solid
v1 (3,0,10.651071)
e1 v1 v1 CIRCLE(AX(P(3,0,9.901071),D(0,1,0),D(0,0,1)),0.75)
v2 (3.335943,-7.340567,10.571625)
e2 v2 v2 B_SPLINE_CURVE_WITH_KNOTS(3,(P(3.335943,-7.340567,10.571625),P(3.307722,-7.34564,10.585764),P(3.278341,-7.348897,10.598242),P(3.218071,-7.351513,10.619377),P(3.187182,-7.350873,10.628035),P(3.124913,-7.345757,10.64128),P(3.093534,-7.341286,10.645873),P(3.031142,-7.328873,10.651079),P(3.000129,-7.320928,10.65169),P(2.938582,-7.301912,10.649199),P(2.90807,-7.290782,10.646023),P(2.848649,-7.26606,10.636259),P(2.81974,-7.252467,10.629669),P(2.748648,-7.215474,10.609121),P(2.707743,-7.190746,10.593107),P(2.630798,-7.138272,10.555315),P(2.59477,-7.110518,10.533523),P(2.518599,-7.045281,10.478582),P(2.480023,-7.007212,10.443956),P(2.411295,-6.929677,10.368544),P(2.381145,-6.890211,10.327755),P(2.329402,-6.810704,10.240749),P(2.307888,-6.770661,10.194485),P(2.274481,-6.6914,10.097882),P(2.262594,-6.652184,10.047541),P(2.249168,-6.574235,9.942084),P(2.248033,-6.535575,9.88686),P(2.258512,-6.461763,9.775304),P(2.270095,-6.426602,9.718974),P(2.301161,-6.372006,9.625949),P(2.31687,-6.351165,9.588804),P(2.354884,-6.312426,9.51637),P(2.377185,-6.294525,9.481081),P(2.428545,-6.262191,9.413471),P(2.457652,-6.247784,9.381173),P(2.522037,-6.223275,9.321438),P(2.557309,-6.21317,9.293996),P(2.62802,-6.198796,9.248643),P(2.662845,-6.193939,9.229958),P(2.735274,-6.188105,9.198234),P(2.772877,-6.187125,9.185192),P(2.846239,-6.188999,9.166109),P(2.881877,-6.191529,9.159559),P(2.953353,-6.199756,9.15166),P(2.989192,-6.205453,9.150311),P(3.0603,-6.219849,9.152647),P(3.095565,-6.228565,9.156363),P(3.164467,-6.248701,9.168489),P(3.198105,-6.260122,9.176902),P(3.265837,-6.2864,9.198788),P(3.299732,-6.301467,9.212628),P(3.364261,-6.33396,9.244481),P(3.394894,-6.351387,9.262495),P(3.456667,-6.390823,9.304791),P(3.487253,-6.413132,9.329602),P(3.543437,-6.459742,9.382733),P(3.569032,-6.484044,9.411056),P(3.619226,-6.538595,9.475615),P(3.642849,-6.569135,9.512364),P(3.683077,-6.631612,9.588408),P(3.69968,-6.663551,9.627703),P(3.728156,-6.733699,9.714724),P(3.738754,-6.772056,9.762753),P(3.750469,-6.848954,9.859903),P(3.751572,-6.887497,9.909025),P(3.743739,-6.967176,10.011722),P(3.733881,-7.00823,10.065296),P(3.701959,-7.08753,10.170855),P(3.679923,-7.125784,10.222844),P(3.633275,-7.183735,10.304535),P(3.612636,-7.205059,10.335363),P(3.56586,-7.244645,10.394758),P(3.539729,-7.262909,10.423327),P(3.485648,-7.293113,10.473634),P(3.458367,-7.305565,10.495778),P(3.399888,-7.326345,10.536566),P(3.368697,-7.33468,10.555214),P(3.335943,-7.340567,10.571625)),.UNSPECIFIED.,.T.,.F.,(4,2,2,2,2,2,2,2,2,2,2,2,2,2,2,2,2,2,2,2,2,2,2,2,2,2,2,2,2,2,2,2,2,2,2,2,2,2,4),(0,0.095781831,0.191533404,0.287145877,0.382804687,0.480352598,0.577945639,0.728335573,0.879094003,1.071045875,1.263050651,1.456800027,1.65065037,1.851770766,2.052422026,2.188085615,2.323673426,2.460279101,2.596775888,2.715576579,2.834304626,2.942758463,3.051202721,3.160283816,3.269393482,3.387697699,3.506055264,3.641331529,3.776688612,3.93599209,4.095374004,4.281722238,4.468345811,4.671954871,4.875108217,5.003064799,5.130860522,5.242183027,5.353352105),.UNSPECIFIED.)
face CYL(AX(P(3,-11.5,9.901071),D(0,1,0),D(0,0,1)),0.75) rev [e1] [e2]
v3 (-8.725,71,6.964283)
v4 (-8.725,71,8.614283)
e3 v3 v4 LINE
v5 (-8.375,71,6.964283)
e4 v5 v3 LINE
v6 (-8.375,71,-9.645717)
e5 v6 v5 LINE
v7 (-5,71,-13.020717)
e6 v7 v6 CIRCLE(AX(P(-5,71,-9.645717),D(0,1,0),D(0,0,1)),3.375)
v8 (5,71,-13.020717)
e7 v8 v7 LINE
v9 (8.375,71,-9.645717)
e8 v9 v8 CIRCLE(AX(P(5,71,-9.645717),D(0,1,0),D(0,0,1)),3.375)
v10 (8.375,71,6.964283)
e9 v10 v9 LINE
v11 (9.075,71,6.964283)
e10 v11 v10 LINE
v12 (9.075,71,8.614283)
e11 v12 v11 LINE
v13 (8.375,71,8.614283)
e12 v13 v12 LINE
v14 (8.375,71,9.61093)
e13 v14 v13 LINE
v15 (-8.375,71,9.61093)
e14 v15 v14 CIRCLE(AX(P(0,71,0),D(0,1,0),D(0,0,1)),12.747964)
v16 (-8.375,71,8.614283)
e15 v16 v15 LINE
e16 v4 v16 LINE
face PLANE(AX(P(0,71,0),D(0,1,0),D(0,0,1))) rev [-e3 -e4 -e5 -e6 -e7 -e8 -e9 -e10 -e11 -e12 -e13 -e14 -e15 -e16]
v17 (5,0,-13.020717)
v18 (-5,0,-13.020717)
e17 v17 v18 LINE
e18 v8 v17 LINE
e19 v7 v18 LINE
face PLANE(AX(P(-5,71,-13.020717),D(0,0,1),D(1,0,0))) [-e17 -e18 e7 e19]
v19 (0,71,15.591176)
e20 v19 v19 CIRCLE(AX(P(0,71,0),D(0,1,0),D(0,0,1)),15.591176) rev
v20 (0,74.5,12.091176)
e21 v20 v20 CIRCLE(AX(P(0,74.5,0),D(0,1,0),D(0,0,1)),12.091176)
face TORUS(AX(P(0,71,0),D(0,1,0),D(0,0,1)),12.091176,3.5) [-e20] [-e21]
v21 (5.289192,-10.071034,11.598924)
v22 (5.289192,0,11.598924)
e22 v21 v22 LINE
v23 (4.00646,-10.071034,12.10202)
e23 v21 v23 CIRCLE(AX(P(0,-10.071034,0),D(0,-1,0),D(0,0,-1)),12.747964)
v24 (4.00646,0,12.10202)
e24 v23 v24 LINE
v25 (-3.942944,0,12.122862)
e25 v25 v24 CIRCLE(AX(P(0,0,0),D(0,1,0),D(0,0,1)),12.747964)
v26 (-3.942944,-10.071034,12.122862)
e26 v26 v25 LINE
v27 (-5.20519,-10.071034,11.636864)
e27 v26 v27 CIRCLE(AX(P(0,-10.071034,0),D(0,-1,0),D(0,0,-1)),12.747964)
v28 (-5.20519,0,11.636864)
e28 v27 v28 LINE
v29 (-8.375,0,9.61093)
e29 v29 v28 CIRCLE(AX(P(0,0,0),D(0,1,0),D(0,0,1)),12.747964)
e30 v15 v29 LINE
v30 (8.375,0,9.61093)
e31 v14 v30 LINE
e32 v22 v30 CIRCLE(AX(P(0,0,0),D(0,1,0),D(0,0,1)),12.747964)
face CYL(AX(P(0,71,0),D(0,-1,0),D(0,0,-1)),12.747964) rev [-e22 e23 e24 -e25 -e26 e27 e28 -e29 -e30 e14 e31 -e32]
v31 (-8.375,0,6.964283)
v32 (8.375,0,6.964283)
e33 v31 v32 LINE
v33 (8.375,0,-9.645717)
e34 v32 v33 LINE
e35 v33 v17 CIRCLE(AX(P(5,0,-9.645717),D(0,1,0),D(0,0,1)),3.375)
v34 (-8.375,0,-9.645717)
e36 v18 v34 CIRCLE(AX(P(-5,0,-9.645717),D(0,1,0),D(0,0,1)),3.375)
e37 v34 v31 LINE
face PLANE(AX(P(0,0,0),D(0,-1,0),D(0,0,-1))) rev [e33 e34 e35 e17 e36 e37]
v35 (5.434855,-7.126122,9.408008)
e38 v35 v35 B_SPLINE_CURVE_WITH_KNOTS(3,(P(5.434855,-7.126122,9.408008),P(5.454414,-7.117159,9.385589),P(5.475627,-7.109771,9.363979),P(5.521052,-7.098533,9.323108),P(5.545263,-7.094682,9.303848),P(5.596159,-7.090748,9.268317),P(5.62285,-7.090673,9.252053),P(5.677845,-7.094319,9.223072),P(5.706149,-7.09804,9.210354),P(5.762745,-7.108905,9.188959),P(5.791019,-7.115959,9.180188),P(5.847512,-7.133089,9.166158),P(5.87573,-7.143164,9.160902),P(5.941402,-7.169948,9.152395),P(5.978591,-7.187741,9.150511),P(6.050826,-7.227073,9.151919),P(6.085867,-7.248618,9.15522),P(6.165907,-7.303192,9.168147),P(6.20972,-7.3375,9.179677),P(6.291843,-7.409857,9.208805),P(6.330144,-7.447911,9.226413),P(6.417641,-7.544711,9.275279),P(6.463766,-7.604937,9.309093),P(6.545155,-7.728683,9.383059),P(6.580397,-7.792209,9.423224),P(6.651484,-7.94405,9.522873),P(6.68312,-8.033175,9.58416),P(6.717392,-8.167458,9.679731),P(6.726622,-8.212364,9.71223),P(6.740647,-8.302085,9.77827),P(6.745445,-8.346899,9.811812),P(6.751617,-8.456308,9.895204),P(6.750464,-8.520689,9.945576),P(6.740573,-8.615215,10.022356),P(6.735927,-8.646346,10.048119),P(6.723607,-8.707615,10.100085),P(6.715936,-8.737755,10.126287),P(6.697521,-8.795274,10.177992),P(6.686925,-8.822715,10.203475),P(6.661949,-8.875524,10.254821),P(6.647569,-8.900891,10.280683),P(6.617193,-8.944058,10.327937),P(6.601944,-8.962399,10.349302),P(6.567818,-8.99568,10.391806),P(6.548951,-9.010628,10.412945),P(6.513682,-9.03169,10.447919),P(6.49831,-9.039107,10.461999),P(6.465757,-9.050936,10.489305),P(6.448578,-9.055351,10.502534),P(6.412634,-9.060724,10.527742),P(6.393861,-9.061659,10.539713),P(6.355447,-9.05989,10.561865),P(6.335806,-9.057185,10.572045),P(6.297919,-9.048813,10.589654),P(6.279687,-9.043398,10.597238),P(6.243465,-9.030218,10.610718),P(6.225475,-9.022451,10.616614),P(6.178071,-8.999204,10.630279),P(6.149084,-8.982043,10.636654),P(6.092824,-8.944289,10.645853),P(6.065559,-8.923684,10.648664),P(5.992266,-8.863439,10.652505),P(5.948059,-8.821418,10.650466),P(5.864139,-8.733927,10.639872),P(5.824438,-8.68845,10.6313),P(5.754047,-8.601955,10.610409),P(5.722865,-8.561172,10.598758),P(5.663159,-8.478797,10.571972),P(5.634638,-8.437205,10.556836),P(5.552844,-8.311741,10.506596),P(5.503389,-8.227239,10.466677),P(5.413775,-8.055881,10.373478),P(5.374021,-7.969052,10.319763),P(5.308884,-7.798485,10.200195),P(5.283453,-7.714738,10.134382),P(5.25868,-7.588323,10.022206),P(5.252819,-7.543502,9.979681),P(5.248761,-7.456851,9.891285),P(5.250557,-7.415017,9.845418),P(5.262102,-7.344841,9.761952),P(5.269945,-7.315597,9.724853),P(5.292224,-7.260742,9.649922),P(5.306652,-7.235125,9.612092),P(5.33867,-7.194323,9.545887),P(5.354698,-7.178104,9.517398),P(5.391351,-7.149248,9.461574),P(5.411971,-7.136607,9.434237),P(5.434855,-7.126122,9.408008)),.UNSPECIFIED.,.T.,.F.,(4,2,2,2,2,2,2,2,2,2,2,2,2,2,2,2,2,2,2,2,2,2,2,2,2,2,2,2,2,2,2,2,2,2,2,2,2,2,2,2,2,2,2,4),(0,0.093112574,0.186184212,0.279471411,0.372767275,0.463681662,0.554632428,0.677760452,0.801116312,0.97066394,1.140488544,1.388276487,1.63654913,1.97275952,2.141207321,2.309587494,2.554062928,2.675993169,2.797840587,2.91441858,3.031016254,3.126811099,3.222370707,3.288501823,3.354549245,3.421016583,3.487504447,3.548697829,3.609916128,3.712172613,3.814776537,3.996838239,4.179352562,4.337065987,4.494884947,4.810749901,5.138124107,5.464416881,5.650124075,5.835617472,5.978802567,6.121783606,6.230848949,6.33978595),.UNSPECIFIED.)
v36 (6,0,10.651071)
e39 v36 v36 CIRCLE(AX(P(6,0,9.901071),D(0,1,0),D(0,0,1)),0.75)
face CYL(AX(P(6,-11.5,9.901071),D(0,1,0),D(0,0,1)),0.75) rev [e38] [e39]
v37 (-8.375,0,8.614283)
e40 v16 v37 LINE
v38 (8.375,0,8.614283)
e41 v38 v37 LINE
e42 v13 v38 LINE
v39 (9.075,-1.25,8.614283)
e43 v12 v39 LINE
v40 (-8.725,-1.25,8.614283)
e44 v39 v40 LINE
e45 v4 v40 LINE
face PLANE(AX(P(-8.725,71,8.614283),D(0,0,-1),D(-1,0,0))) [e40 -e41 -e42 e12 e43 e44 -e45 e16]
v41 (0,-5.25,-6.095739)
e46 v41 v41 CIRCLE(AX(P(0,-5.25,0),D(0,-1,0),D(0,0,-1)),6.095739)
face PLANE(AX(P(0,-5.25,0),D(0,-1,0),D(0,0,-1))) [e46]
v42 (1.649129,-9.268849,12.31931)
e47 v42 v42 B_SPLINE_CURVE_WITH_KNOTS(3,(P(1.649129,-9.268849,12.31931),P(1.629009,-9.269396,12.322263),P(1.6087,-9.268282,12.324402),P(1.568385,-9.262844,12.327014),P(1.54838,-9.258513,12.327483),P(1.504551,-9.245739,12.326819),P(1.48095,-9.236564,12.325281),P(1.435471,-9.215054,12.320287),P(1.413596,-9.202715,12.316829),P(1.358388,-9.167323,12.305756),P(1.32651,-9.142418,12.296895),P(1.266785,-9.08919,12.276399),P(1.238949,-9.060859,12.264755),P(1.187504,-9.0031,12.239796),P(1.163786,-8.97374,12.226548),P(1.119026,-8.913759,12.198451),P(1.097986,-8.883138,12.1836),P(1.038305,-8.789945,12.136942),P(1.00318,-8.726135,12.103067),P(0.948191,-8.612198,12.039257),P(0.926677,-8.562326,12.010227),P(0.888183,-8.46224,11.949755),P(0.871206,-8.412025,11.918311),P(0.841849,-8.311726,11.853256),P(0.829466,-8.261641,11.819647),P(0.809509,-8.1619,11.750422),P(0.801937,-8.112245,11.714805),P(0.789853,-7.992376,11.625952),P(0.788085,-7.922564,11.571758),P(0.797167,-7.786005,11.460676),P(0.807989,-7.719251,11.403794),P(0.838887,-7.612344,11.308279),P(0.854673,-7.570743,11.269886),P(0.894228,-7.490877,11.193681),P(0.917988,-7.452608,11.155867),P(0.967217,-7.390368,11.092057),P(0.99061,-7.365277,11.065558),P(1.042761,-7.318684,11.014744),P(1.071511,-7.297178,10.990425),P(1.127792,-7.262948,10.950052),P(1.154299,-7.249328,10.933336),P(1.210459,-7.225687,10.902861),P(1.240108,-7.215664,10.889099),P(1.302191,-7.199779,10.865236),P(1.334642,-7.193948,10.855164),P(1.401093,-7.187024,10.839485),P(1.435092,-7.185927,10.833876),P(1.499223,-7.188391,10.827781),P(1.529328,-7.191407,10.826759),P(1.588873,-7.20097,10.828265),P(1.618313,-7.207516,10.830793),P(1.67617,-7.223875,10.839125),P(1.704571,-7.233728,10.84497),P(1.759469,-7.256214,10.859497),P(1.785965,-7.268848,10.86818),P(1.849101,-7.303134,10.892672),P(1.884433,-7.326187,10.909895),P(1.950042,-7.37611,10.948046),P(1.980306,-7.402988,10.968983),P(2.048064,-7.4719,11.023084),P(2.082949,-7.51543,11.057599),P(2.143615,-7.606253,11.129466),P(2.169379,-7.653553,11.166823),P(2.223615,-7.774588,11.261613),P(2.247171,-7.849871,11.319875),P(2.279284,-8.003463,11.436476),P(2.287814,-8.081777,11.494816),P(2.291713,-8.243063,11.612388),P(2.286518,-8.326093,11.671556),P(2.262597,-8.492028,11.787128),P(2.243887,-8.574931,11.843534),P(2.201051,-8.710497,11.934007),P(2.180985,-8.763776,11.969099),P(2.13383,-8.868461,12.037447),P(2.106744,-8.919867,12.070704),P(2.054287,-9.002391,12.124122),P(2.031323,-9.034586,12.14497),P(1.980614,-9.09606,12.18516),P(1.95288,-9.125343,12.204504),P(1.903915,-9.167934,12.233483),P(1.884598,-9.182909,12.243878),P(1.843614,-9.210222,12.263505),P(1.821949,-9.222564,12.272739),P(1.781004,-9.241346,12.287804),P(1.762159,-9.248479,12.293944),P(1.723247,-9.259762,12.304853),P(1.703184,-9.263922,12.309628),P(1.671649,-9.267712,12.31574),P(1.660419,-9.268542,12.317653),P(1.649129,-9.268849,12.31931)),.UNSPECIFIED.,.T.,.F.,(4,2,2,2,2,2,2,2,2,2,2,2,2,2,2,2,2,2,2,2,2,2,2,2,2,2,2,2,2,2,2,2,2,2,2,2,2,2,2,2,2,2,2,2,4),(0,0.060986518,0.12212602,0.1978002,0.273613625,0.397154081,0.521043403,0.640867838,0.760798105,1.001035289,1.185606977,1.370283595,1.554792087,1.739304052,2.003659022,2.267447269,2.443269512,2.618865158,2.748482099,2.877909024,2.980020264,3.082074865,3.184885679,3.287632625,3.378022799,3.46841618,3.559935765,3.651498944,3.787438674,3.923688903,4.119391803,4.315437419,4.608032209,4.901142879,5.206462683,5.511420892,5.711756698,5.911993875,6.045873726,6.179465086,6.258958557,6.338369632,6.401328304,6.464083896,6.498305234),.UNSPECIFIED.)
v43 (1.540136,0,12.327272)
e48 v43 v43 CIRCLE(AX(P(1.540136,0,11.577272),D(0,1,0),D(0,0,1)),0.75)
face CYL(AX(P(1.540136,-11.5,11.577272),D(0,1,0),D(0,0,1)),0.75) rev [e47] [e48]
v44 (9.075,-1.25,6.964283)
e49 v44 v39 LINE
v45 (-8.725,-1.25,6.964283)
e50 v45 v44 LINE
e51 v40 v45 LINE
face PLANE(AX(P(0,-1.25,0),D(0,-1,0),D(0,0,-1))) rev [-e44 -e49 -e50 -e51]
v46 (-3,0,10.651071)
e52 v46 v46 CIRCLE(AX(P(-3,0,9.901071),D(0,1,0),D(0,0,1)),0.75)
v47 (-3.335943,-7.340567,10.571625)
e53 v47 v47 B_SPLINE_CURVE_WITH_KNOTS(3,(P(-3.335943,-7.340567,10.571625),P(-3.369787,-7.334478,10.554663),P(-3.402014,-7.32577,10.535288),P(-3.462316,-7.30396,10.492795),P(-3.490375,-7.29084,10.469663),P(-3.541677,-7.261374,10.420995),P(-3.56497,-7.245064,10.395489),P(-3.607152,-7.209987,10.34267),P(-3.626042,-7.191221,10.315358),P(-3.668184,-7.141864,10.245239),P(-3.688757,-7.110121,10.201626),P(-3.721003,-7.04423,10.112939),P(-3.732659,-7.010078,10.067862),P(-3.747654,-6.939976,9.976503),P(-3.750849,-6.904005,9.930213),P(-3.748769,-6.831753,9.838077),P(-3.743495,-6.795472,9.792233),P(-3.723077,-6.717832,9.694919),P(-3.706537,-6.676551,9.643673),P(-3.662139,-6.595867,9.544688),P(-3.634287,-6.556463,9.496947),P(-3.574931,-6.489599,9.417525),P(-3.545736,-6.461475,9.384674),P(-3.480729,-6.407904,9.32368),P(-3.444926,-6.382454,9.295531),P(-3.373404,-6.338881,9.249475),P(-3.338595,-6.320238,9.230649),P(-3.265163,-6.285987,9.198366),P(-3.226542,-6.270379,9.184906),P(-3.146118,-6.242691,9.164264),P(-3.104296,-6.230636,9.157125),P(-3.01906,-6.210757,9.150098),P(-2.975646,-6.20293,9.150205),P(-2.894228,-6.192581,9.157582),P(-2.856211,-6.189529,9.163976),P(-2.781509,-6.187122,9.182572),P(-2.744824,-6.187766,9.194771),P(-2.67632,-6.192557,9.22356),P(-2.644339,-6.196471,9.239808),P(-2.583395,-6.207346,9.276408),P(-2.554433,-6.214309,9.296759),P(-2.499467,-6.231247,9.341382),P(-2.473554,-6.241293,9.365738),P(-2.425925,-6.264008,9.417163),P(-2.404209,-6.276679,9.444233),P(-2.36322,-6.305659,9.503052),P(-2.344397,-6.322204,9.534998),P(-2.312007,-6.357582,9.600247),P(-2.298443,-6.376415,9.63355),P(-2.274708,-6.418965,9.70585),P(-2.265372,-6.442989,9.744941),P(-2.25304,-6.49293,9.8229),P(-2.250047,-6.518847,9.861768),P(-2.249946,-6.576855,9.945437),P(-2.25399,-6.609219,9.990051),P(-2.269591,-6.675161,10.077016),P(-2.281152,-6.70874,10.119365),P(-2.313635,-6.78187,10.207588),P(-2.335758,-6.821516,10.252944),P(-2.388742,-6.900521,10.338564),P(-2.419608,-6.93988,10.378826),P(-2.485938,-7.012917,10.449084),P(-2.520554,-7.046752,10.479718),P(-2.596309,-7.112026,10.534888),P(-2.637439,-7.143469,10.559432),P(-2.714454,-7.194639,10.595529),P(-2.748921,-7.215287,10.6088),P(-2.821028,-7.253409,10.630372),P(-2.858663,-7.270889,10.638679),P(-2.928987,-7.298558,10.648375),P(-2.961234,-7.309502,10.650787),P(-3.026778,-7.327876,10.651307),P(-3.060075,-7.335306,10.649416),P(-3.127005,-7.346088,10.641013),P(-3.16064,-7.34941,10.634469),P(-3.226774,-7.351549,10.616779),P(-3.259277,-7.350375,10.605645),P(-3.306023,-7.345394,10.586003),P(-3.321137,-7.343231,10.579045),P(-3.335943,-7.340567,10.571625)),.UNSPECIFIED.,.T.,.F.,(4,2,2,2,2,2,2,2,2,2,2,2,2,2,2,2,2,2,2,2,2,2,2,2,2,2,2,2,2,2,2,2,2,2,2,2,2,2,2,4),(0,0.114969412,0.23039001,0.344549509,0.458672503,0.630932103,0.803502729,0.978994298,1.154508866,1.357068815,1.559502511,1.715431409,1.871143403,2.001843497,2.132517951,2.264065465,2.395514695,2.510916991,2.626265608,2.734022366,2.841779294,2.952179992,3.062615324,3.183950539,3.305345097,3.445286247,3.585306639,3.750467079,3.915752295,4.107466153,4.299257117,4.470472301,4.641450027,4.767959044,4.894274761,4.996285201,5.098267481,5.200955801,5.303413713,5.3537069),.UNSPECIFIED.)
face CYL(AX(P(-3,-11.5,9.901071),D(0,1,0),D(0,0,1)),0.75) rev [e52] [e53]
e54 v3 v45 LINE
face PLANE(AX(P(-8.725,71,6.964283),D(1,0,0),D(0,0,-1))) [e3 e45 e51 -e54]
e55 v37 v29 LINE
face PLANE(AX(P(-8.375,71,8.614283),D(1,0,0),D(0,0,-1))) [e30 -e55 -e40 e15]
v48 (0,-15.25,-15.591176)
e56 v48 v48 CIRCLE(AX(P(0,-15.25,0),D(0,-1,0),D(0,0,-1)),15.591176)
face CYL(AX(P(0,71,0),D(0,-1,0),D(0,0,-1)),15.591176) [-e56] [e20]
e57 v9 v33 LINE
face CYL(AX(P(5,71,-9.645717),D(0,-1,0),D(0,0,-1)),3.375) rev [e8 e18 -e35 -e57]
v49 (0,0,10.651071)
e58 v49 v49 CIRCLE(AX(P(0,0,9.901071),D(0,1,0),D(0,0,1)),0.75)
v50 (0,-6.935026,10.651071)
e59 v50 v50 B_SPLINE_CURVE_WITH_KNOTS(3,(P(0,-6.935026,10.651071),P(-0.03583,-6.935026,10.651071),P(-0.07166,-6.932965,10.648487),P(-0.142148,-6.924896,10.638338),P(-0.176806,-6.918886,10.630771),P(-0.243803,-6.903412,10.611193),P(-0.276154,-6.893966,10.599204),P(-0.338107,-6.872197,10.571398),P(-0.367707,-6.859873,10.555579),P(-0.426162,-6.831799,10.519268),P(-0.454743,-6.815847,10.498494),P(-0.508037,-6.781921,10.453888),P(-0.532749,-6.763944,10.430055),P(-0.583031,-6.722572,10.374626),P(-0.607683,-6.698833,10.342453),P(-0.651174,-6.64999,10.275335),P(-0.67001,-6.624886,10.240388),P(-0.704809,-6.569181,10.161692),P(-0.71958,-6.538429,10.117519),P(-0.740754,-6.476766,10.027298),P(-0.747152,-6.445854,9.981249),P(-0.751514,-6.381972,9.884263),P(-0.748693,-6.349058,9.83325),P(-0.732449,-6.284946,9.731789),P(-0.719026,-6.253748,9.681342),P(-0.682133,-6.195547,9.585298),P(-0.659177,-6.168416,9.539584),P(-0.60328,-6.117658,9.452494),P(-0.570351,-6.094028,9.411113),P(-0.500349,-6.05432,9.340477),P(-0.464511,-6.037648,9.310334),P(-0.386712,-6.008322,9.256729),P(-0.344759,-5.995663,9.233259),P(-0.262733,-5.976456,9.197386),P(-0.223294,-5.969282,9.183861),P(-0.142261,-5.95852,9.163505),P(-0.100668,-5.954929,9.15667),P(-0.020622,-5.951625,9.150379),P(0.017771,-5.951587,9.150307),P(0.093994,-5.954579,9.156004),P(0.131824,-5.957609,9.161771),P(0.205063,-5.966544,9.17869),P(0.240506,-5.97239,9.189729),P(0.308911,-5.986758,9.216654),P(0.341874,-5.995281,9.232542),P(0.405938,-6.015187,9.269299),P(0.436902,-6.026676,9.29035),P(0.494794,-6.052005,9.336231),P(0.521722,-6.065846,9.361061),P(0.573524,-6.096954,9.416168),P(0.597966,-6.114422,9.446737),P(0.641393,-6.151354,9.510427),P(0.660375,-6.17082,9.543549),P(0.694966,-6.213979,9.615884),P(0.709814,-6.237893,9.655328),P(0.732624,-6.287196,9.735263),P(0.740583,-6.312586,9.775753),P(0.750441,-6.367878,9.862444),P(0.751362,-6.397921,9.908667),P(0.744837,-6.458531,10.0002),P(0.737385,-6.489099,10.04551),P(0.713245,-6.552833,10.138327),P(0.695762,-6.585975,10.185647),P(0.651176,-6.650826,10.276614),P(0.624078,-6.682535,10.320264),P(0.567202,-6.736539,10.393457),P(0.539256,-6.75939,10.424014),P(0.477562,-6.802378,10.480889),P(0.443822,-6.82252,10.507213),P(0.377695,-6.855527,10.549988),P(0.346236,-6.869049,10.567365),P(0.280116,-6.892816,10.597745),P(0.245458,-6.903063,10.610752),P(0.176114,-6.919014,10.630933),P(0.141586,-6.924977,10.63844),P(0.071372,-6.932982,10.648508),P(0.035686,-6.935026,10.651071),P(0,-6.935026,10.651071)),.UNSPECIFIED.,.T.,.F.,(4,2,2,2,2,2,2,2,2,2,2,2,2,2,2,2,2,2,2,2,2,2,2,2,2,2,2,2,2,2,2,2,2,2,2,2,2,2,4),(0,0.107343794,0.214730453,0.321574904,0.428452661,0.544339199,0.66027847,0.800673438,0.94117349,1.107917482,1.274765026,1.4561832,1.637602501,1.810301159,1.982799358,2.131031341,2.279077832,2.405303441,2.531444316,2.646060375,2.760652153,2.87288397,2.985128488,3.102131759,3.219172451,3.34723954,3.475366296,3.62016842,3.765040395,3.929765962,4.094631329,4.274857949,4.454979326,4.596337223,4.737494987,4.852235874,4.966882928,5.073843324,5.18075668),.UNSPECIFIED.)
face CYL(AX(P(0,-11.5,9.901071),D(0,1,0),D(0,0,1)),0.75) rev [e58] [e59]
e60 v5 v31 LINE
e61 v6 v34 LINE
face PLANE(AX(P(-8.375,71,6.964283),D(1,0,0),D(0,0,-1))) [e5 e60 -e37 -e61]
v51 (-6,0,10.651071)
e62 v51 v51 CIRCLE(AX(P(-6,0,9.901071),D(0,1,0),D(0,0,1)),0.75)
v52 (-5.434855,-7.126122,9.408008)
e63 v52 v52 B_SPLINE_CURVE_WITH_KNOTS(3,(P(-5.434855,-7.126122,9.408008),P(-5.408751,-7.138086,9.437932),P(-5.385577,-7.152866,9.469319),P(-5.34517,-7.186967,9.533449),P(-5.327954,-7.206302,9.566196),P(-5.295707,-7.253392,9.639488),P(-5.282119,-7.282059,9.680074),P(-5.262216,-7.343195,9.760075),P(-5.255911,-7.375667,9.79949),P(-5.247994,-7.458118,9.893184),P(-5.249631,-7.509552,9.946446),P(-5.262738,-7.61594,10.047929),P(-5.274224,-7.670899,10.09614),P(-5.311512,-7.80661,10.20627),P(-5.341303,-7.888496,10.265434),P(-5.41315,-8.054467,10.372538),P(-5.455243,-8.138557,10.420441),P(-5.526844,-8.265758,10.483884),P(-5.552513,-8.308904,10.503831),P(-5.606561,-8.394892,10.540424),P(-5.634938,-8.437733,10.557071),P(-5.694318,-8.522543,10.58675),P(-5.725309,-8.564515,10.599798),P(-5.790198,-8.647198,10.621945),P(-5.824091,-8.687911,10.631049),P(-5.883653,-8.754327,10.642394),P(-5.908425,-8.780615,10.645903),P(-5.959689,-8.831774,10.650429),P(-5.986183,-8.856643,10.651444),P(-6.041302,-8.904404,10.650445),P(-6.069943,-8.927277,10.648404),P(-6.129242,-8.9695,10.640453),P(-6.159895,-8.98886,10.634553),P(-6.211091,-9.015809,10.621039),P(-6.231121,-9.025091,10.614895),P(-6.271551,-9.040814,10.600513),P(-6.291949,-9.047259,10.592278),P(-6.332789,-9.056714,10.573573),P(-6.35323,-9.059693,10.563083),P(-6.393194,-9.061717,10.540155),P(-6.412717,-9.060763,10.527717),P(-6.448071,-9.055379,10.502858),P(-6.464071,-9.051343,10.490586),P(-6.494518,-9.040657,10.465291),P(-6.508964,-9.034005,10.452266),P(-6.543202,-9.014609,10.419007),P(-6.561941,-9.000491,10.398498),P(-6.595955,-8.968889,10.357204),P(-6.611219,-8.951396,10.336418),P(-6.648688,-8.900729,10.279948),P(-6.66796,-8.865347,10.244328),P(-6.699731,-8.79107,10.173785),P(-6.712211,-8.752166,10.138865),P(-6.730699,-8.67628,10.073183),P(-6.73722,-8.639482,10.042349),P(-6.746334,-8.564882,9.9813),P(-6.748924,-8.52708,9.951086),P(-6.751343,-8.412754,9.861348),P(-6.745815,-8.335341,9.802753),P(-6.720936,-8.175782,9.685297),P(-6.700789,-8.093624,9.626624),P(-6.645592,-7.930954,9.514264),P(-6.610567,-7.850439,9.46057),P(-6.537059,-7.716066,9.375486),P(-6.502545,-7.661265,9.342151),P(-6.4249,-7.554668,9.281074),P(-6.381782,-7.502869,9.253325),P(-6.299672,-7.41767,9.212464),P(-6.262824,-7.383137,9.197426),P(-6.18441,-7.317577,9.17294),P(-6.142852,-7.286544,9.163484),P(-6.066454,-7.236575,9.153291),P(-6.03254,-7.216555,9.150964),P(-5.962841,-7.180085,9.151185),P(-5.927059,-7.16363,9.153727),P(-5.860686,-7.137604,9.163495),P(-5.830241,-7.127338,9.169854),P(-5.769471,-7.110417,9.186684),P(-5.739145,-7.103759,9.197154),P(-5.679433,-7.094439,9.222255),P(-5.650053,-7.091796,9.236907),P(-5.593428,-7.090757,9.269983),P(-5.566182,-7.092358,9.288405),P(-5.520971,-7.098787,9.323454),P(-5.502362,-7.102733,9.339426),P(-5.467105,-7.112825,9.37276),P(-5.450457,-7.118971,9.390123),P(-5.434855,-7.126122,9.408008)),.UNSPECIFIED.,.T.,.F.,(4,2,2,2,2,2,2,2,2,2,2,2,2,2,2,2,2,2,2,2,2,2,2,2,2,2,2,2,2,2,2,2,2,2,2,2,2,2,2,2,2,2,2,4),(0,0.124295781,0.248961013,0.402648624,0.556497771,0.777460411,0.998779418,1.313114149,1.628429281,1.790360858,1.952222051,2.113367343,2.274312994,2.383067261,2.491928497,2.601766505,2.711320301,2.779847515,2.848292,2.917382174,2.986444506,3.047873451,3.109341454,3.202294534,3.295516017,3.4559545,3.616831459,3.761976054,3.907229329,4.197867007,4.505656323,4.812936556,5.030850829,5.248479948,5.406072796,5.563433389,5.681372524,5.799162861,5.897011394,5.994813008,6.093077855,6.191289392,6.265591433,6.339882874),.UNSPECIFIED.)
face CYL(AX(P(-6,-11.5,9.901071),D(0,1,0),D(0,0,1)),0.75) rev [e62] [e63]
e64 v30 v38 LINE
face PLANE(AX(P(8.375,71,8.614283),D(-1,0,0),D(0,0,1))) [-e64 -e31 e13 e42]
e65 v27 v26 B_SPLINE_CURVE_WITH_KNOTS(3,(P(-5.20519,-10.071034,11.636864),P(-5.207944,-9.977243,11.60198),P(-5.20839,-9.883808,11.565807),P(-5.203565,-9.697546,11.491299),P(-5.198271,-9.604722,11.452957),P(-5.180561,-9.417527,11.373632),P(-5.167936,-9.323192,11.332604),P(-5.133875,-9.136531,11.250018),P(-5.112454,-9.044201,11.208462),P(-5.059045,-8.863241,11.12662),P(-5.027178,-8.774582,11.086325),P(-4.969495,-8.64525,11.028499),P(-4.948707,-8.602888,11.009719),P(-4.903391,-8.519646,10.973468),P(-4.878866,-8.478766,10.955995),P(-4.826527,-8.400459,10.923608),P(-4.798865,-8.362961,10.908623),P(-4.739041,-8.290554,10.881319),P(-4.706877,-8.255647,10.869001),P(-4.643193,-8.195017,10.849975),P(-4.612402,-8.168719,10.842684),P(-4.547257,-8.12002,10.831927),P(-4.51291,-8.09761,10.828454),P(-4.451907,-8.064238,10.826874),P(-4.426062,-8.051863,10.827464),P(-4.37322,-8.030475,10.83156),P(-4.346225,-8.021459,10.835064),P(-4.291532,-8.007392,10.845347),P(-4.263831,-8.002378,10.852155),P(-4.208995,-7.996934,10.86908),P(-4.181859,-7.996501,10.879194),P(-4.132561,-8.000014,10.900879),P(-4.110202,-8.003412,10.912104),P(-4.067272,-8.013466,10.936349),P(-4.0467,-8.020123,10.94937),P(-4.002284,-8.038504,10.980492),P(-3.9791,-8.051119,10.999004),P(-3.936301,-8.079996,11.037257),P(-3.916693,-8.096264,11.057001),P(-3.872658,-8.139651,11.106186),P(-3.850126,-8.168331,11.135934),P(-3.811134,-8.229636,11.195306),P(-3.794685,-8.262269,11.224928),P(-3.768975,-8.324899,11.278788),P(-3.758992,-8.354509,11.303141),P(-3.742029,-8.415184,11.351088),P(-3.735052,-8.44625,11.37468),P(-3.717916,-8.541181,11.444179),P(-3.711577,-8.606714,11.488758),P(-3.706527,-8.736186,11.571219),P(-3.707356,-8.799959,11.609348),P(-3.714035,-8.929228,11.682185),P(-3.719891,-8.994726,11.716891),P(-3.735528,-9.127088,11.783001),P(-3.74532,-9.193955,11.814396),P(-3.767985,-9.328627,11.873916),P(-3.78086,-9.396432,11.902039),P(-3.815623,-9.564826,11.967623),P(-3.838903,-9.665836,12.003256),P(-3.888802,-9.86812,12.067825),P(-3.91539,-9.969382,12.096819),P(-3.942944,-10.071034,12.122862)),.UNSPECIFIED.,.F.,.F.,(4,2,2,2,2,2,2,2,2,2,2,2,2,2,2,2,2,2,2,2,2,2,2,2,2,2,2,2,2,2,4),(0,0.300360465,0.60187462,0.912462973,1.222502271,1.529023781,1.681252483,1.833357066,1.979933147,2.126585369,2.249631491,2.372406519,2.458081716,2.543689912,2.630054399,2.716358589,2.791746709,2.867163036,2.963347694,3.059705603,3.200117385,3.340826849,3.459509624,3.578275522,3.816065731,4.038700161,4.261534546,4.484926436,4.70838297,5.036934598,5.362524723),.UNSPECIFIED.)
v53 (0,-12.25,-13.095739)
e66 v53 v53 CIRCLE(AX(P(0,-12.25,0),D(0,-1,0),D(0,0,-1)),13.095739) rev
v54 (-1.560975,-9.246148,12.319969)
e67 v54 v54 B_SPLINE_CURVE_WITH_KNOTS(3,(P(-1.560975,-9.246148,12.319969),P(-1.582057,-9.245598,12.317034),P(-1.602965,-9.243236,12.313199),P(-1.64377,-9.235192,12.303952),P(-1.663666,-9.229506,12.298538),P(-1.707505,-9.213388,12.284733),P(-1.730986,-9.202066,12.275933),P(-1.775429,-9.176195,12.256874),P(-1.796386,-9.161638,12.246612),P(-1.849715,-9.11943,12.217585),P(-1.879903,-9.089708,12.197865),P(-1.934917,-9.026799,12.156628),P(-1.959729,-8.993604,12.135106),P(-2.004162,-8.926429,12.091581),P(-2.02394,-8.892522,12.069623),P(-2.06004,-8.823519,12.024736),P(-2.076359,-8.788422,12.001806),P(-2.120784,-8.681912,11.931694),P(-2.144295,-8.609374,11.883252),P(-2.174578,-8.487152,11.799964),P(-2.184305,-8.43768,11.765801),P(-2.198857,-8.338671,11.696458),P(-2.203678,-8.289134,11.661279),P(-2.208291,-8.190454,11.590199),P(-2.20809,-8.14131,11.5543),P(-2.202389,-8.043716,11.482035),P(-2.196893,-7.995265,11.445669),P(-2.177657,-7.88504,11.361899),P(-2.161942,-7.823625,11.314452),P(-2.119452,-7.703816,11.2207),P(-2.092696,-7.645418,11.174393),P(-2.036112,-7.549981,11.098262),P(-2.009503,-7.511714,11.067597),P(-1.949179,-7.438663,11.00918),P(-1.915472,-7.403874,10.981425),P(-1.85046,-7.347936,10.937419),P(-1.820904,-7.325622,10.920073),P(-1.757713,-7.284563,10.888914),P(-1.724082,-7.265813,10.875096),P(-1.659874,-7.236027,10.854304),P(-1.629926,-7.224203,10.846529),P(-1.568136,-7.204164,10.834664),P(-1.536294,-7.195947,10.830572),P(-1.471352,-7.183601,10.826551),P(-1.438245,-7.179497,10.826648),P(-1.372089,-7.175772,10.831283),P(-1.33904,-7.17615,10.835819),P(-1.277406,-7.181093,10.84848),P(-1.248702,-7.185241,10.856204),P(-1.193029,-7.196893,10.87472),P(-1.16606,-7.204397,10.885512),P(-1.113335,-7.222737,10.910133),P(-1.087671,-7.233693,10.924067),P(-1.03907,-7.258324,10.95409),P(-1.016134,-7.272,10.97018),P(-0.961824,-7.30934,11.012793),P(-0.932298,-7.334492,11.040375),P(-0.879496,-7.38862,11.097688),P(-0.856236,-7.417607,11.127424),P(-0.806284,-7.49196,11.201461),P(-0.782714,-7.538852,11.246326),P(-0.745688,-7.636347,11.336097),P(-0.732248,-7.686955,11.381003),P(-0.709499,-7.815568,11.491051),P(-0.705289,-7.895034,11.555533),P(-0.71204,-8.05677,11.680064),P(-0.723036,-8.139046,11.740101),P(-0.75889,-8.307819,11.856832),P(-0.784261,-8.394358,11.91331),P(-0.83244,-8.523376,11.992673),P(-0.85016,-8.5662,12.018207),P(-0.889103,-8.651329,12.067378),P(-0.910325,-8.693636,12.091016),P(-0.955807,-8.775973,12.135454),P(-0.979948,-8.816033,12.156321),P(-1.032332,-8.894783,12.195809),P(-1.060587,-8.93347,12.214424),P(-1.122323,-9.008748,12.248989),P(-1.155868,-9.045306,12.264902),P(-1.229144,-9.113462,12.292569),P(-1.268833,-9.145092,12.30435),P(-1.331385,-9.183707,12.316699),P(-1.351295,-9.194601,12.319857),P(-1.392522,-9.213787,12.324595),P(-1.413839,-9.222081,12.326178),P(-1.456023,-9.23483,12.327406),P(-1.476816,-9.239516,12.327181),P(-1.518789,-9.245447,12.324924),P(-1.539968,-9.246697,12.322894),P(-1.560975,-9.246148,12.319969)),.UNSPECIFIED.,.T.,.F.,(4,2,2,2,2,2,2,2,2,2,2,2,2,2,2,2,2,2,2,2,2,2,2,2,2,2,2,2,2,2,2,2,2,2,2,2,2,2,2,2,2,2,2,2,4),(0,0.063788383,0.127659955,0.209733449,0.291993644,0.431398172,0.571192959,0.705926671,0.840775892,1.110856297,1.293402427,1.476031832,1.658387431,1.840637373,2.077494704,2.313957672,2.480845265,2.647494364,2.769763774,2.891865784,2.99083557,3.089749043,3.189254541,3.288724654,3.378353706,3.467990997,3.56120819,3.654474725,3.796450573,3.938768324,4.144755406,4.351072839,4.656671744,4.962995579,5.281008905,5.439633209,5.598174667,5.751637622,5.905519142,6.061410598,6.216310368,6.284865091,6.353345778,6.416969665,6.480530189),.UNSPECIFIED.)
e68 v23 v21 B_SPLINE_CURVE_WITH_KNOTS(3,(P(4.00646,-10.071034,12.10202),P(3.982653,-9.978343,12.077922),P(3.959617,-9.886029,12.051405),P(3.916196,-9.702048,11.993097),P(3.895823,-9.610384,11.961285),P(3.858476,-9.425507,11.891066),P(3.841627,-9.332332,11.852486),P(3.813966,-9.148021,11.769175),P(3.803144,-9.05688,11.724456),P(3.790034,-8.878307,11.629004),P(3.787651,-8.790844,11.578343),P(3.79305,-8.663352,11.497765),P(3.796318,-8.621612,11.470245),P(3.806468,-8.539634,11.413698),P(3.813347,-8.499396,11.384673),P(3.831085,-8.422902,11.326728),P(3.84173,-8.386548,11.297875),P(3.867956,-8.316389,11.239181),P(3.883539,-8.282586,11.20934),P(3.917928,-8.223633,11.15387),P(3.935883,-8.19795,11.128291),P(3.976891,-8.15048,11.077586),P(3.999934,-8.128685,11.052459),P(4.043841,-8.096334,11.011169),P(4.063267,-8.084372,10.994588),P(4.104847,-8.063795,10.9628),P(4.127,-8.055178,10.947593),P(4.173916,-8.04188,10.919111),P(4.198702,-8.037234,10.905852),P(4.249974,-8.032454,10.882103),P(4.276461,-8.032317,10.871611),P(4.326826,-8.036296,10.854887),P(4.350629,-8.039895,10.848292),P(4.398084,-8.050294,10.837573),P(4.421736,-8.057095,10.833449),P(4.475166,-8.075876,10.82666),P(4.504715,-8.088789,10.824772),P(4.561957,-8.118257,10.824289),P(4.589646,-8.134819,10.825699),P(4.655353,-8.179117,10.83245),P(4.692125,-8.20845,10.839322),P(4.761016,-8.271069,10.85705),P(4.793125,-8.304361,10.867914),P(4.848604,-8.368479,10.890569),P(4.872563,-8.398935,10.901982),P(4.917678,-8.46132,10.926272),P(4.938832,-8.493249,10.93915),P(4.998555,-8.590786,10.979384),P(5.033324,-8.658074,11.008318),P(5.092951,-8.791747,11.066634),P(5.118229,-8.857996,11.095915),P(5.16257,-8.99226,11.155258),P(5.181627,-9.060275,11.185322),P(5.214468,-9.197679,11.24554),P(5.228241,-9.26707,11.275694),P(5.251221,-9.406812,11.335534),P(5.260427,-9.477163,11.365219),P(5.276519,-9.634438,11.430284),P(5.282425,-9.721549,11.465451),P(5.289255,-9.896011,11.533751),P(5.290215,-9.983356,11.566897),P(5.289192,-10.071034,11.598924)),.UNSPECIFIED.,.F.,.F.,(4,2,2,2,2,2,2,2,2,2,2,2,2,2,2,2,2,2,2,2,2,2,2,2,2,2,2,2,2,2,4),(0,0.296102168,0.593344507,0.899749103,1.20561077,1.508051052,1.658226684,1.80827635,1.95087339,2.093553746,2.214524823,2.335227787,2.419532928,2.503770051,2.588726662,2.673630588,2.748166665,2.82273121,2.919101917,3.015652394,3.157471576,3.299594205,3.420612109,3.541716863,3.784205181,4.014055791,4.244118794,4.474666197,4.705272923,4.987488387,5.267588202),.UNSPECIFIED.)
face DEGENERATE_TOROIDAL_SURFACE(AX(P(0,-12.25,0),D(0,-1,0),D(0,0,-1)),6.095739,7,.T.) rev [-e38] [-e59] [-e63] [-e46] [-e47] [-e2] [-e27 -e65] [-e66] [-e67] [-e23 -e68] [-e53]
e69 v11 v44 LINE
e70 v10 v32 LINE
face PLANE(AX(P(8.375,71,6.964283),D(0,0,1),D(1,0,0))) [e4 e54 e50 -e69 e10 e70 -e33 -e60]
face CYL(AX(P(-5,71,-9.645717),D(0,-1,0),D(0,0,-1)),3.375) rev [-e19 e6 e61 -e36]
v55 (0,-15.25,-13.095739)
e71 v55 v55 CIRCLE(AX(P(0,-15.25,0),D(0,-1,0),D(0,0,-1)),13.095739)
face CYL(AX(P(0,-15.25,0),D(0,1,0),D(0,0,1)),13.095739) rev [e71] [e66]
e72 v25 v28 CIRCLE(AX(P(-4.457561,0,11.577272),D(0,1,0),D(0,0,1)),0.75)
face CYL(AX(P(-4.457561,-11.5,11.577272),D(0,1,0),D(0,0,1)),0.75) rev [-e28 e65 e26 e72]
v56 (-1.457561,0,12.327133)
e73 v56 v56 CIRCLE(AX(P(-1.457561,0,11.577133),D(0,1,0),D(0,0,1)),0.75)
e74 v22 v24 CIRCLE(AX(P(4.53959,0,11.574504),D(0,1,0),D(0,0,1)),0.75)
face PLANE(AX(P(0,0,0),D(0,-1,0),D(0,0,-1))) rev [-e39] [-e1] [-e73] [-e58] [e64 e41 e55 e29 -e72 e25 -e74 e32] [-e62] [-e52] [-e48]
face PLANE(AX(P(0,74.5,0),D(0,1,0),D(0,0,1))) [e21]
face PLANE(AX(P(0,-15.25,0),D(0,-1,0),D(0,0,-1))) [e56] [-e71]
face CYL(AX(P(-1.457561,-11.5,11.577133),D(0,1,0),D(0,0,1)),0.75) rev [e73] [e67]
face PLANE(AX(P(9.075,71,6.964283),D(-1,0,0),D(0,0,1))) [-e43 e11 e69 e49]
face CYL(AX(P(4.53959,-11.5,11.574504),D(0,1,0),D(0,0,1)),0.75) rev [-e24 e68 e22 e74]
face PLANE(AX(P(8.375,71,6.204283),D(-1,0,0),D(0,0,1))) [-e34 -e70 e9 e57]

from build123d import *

# Parameters (mm, degrees)
SKETCH1_R           = 15.591175954
BOSS_EXTRUDE1_DEPTH = 71
BOSS_EXTRUDE2_START = 1.25
SKETCH2_R           = 15.591175954
SKETCH2_W           = 17.8
SKETCH2_H           = 1.65
BOSS_EXTRUDE2_DEPTH = 1.25
BOSS_EXTRUDE3_START = 4
SKETCH3_R           = 15.591175954
BOSS_EXTRUDE3_DEPTH = 4
CUT_EXTRUDE4_START  = -11.5
SKETCH16_R          = 0.75
CUT_EXTRUDE4_DEPTH  = 11.5
BOSS_EXTRUDE8_START = 10
SKETCH18_R          = 15.591175954
SKETCH18_R_2        = 13.095738675
BOSS_EXTRUDE8_DEPTH = 10
FILLET3_START       = -12.2500001
FILLET3_OUTLINE_R   = 13.095738675
FILLET3_OUTLINE_R_2 = 0.75
FILLET3_DEPTH       = 7.0000001
FILLET3_START_2     = -11
FILLET3_3_DEPTH     = 5.75
SKETCH26_R          = 15.591175954
BOSS_EXTRUDE9_DEPTH = 3.5
FILLET4_R           = 3.5


with BuildPart() as part:
    # Sketch1 → Boss-Extrude1 (new body)
    with BuildSketch(Plane(origin=(0, 0, 0), x_dir=(1, 0, 0), z_dir=(0, 1, 0))):
        with Locations(Location((0, 0, 0), (0, 0, 270))):
            Circle(SKETCH1_R)
        with BuildLine():
            Line((8.375, -6.964282891), (9.075, -6.964282891))
            Line((9.075, -6.964282891), (9.075, -8.614282891))
            Line((9.075, -8.614282891), (8.375, -8.614282891))
            Line((8.375, -8.614282891), (8.375, -9.610929808))
            ThreePointArc((8.375, -9.610929808), (0, -12.747964417), (-8.375, -9.610929808))
            Line((-8.375, -9.610929808), (-8.375, -8.614282891))
            Line((-8.375, -8.614282891), (-8.725, -8.614282891))
            Line((-8.725, -8.614282891), (-8.725, -6.964282891))
            Line((-8.725, -6.964282891), (-8.375, -6.964282891))
            Line((-8.375, -6.964282891), (-8.375, -6.204282891))
            Line((-8.375, -6.204282891), (-8.375, 9.645717109))
            ThreePointArc((-8.375, 9.645717109), (-7.386485387, 12.032202496), (-5, 13.020717109))
            Line((-5, 13.020717109), (5, 13.020717109))
            ThreePointArc((5, 13.020717109), (7.386485387, 12.032202496), (8.375, 9.645717109))
            Line((8.375, 9.645717109), (8.375, -6.204282891))
            Line((8.375, -6.204282891), (8.375, -6.964282891))
        make_face(mode=Mode.SUBTRACT)
    extrude(amount=BOSS_EXTRUDE1_DEPTH)

    # Sketch2 → Boss-Extrude2 (add)
    with BuildSketch(Plane.XZ.offset(BOSS_EXTRUDE2_START)):
        with Locations(Location((0, 0, 0), (0, 0, 270))):
            Circle(SKETCH2_R)
        with Locations((0.175, 7.789282891)):
            Rectangle(SKETCH2_W, SKETCH2_H, mode=Mode.SUBTRACT)
    extrude(amount=-BOSS_EXTRUDE2_DEPTH)

    # Sketch3 → Boss-Extrude3 (add)
    with BuildSketch(Plane.XZ.offset(1.25).offset(BOSS_EXTRUDE3_START)):
        with Locations(Location((0, 0, 0), (0, 0, 270))):
            Circle(SKETCH3_R)
    extrude(amount=-BOSS_EXTRUDE3_DEPTH)

    # Sketch16 → Cut-Extrude4 (cut)
    with BuildSketch(Plane(origin=(0, 0, 0), x_dir=(1, 0, 0), z_dir=(0, 1, 0)).offset(CUT_EXTRUDE4_START)):
        with BuildLine():
            Line((-3.75, -9.901070776), (-3, -9.901070776))
            Line((-3, -9.901070776), (-2.25, -9.901070776))
            ThreePointArc((-2.25, -9.901070776), (-3, -9.151070776), (-3.75, -9.901070776))
        make_face()
        with BuildLine():
            Line((-2.25, -9.901070776), (-3, -9.901070776))
            Line((-3, -9.901070776), (-3.75, -9.901070776))
            ThreePointArc((-3.75, -9.901070776), (-3, -10.651070776), (-2.25, -9.901070776))
        make_face()
        with BuildLine():
            ThreePointArc((6.75, -9.901070776), (6, -9.151070776), (5.25, -9.901070776))
            ThreePointArc((5.25, -9.901070776), (6, -10.651070776), (6.75, -9.901070776))
        make_face()
        with BuildLine():
            ThreePointArc((3.75, -9.901070776), (3, -9.151070776), (2.25, -9.901070776))
            Line((2.25, -9.901070776), (3, -9.901070776))
            Line((3, -9.901070776), (3.75, -9.901070776))
        make_face()
        with BuildLine():
            Line((3, -9.901070776), (2.25, -9.901070776))
            ThreePointArc((2.25, -9.901070776), (3, -10.651070776), (3.75, -9.901070776))
            Line((3.75, -9.901070776), (3, -9.901070776))
        make_face()
        with BuildLine():
            ThreePointArc((0.75, -9.901070776), (0, -9.151070776), (-0.75, -9.901070776))
            Line((-0.75, -9.901070776), (0, -9.901070776))
            Line((0, -9.901070776), (0.75, -9.901070776))
        make_face()
        with BuildLine():
            Line((0, -9.901070776), (-0.75, -9.901070776))
            ThreePointArc((-0.75, -9.901070776), (0, -10.651070776), (0.75, -9.901070776))
            Line((0.75, -9.901070776), (0, -9.901070776))
        make_face()
        with Locations(Location((-6, -9.901070776, 0), (0, 0, 270))):
            Circle(SKETCH16_R)
        with BuildLine():
            ThreePointArc((5.289192257, -11.598924176), (4.550417773, -10.824582592), (3.789595018, -11.577272013))
            ThreePointArc((3.789595018, -11.577272013), (3.846450326, -11.860961254), (4.006459728, -12.102019552))
            ThreePointArc((4.006459728, -12.102019552), (4.654628095, -11.867815051), (5.289192257, -11.598924176))
        make_face()
        with BuildLine():
            ThreePointArc((2.290136401, -11.577272013), (1.540136401, -10.827272013), (0.790136401, -11.577272013))
            Line((0.790136401, -11.577272013), (1.540136401, -11.577272013))
            Line((1.540136401, -11.577272013), (2.290136401, -11.577272013))
        make_face()
        with BuildLine():
            Line((1.540136401, -11.577272013), (0.790136401, -11.577272013))
            ThreePointArc((0.790136401, -11.577272013), (1.540136401, -12.327272013), (2.290136401, -11.577272013))
            Line((2.290136401, -11.577272013), (1.540136401, -11.577272013))
        make_face()
        with BuildLine():
            ThreePointArc((-0.707561207, -11.577133163), (-2.207561203, -11.577063737), (-0.707561219, -11.577272013))
            ThreePointArc((-0.707561219, -11.577272013), (-0.70756121, -11.577202588), (-0.707561207, -11.577133163))
        make_face()
        with BuildLine():
            ThreePointArc((-5.205190023, -11.636863564), (-4.580517042, -11.896615502), (-3.942943702, -12.122862358))
            ThreePointArc((-3.942943702, -12.122862358), (-4.188076003, -10.877359358), (-5.205190023, -11.636863564))
        make_face()
    extrude(amount=CUT_EXTRUDE4_DEPTH, mode=Mode.SUBTRACT)

    # Sketch18 → Boss-Extrude8 (add)
    with BuildSketch(Plane.XZ.offset(5.25).offset(BOSS_EXTRUDE8_START)):
        with Locations(Location((0, 0, 0), (0, 0, 270))):
            Circle(SKETCH18_R)
        with Locations(Location((0, 0, 0), (0, 0, 270))):
            Circle(SKETCH18_R_2, mode=Mode.SUBTRACT)
    extrude(amount=-BOSS_EXTRUDE8_DEPTH)

    # Fillet3: read off the stored shape, not the designer's step
    # Fillet3 outline → Fillet3 (add)
    with BuildSketch(Plane(origin=(0, 0, 0), x_dir=(1, 0, 0), z_dir=(0, 1, 0)).offset(FILLET3_START)):
        Circle(FILLET3_OUTLINE_R)
        with Locations((-6, -9.901070776)):
            Circle(FILLET3_OUTLINE_R_2, mode=Mode.SUBTRACT)
        with Locations((-1.457561207, -11.577133163)):
            Circle(FILLET3_OUTLINE_R_2, mode=Mode.SUBTRACT)
        with Locations((-3, -9.901070776)):
            Circle(FILLET3_OUTLINE_R_2, mode=Mode.SUBTRACT)
        with Locations((1.540136401, -11.577272013)):
            Circle(FILLET3_OUTLINE_R_2, mode=Mode.SUBTRACT)
        with Locations((0, -9.901070776)):
            Circle(FILLET3_OUTLINE_R_2, mode=Mode.SUBTRACT)
        with Locations((3, -9.901070776)):
            Circle(FILLET3_OUTLINE_R_2, mode=Mode.SUBTRACT)
        with Locations((6, -9.901070776)):
            Circle(FILLET3_OUTLINE_R_2, mode=Mode.SUBTRACT)
    extrude(amount=FILLET3_DEPTH)

    # Fillet3 2 outline → Fillet3 2 (revolve, cut)
    with BuildSketch(Plane.XY):
        with BuildLine():
            Line((6.095738675, -5.25), (0, -5.25))
            Line((0, -5.25), (0, -12.25))
            Line((0, -12.25), (13.095738675, -12.25))
            ThreePointArc((13.095738675, -12.25), (11.045486143, -7.300252532), (6.095738675, -5.25))
        make_face()
    revolve(axis=Axis((0, 0, 0), (0, 1, 0)), mode=Mode.SUBTRACT)

    # Fillet3 3 outline → Fillet3 3 (cut)
    with BuildSketch(Plane(origin=(0, 0, 0), x_dir=(1, 0, 0), z_dir=(0, 1, 0)).offset(FILLET3_START_2)):
        with BuildLine():
            ThreePointArc((4.006459728, -12.102019552), (4.654628094, -11.867815051), (5.289192257, -11.598924176))
            ThreePointArc((5.289192257, -11.598924176), (4.265744538, -10.876286186), (4.006459728, -12.102019552))
        make_face()
        with BuildLine():
            ThreePointArc((-5.205190023, -11.636863564), (-4.580517042, -11.896615502), (-3.942943702, -12.122862358))
            ThreePointArc((-3.942943702, -12.122862358), (-4.188076003, -10.877359358), (-5.205190023, -11.636863564))
        make_face()
    extrude(amount=FILLET3_3_DEPTH, mode=Mode.SUBTRACT)

    # Sketch26 → Boss-Extrude9 (add)
    with BuildSketch(Plane(origin=(0, 71, 0), x_dir=(1, 0, 0), z_dir=(0, 1, 0))):
        with Locations(Location((0, 0, 0), (0, 0, 90))):
            Circle(SKETCH26_R)
    extrude(amount=BOSS_EXTRUDE9_DEPTH)

    # Fillet4
    fillet4_edges = [part.edges().sort_by_distance(p)[0] for p in [
        (0, 74.5, 15.591175954),
    ]]
    fillet(fillet4_edges, radius=FILLET4_R - 0.0001)  # a hair under: the kernel refuses the full size


solid = part.part
